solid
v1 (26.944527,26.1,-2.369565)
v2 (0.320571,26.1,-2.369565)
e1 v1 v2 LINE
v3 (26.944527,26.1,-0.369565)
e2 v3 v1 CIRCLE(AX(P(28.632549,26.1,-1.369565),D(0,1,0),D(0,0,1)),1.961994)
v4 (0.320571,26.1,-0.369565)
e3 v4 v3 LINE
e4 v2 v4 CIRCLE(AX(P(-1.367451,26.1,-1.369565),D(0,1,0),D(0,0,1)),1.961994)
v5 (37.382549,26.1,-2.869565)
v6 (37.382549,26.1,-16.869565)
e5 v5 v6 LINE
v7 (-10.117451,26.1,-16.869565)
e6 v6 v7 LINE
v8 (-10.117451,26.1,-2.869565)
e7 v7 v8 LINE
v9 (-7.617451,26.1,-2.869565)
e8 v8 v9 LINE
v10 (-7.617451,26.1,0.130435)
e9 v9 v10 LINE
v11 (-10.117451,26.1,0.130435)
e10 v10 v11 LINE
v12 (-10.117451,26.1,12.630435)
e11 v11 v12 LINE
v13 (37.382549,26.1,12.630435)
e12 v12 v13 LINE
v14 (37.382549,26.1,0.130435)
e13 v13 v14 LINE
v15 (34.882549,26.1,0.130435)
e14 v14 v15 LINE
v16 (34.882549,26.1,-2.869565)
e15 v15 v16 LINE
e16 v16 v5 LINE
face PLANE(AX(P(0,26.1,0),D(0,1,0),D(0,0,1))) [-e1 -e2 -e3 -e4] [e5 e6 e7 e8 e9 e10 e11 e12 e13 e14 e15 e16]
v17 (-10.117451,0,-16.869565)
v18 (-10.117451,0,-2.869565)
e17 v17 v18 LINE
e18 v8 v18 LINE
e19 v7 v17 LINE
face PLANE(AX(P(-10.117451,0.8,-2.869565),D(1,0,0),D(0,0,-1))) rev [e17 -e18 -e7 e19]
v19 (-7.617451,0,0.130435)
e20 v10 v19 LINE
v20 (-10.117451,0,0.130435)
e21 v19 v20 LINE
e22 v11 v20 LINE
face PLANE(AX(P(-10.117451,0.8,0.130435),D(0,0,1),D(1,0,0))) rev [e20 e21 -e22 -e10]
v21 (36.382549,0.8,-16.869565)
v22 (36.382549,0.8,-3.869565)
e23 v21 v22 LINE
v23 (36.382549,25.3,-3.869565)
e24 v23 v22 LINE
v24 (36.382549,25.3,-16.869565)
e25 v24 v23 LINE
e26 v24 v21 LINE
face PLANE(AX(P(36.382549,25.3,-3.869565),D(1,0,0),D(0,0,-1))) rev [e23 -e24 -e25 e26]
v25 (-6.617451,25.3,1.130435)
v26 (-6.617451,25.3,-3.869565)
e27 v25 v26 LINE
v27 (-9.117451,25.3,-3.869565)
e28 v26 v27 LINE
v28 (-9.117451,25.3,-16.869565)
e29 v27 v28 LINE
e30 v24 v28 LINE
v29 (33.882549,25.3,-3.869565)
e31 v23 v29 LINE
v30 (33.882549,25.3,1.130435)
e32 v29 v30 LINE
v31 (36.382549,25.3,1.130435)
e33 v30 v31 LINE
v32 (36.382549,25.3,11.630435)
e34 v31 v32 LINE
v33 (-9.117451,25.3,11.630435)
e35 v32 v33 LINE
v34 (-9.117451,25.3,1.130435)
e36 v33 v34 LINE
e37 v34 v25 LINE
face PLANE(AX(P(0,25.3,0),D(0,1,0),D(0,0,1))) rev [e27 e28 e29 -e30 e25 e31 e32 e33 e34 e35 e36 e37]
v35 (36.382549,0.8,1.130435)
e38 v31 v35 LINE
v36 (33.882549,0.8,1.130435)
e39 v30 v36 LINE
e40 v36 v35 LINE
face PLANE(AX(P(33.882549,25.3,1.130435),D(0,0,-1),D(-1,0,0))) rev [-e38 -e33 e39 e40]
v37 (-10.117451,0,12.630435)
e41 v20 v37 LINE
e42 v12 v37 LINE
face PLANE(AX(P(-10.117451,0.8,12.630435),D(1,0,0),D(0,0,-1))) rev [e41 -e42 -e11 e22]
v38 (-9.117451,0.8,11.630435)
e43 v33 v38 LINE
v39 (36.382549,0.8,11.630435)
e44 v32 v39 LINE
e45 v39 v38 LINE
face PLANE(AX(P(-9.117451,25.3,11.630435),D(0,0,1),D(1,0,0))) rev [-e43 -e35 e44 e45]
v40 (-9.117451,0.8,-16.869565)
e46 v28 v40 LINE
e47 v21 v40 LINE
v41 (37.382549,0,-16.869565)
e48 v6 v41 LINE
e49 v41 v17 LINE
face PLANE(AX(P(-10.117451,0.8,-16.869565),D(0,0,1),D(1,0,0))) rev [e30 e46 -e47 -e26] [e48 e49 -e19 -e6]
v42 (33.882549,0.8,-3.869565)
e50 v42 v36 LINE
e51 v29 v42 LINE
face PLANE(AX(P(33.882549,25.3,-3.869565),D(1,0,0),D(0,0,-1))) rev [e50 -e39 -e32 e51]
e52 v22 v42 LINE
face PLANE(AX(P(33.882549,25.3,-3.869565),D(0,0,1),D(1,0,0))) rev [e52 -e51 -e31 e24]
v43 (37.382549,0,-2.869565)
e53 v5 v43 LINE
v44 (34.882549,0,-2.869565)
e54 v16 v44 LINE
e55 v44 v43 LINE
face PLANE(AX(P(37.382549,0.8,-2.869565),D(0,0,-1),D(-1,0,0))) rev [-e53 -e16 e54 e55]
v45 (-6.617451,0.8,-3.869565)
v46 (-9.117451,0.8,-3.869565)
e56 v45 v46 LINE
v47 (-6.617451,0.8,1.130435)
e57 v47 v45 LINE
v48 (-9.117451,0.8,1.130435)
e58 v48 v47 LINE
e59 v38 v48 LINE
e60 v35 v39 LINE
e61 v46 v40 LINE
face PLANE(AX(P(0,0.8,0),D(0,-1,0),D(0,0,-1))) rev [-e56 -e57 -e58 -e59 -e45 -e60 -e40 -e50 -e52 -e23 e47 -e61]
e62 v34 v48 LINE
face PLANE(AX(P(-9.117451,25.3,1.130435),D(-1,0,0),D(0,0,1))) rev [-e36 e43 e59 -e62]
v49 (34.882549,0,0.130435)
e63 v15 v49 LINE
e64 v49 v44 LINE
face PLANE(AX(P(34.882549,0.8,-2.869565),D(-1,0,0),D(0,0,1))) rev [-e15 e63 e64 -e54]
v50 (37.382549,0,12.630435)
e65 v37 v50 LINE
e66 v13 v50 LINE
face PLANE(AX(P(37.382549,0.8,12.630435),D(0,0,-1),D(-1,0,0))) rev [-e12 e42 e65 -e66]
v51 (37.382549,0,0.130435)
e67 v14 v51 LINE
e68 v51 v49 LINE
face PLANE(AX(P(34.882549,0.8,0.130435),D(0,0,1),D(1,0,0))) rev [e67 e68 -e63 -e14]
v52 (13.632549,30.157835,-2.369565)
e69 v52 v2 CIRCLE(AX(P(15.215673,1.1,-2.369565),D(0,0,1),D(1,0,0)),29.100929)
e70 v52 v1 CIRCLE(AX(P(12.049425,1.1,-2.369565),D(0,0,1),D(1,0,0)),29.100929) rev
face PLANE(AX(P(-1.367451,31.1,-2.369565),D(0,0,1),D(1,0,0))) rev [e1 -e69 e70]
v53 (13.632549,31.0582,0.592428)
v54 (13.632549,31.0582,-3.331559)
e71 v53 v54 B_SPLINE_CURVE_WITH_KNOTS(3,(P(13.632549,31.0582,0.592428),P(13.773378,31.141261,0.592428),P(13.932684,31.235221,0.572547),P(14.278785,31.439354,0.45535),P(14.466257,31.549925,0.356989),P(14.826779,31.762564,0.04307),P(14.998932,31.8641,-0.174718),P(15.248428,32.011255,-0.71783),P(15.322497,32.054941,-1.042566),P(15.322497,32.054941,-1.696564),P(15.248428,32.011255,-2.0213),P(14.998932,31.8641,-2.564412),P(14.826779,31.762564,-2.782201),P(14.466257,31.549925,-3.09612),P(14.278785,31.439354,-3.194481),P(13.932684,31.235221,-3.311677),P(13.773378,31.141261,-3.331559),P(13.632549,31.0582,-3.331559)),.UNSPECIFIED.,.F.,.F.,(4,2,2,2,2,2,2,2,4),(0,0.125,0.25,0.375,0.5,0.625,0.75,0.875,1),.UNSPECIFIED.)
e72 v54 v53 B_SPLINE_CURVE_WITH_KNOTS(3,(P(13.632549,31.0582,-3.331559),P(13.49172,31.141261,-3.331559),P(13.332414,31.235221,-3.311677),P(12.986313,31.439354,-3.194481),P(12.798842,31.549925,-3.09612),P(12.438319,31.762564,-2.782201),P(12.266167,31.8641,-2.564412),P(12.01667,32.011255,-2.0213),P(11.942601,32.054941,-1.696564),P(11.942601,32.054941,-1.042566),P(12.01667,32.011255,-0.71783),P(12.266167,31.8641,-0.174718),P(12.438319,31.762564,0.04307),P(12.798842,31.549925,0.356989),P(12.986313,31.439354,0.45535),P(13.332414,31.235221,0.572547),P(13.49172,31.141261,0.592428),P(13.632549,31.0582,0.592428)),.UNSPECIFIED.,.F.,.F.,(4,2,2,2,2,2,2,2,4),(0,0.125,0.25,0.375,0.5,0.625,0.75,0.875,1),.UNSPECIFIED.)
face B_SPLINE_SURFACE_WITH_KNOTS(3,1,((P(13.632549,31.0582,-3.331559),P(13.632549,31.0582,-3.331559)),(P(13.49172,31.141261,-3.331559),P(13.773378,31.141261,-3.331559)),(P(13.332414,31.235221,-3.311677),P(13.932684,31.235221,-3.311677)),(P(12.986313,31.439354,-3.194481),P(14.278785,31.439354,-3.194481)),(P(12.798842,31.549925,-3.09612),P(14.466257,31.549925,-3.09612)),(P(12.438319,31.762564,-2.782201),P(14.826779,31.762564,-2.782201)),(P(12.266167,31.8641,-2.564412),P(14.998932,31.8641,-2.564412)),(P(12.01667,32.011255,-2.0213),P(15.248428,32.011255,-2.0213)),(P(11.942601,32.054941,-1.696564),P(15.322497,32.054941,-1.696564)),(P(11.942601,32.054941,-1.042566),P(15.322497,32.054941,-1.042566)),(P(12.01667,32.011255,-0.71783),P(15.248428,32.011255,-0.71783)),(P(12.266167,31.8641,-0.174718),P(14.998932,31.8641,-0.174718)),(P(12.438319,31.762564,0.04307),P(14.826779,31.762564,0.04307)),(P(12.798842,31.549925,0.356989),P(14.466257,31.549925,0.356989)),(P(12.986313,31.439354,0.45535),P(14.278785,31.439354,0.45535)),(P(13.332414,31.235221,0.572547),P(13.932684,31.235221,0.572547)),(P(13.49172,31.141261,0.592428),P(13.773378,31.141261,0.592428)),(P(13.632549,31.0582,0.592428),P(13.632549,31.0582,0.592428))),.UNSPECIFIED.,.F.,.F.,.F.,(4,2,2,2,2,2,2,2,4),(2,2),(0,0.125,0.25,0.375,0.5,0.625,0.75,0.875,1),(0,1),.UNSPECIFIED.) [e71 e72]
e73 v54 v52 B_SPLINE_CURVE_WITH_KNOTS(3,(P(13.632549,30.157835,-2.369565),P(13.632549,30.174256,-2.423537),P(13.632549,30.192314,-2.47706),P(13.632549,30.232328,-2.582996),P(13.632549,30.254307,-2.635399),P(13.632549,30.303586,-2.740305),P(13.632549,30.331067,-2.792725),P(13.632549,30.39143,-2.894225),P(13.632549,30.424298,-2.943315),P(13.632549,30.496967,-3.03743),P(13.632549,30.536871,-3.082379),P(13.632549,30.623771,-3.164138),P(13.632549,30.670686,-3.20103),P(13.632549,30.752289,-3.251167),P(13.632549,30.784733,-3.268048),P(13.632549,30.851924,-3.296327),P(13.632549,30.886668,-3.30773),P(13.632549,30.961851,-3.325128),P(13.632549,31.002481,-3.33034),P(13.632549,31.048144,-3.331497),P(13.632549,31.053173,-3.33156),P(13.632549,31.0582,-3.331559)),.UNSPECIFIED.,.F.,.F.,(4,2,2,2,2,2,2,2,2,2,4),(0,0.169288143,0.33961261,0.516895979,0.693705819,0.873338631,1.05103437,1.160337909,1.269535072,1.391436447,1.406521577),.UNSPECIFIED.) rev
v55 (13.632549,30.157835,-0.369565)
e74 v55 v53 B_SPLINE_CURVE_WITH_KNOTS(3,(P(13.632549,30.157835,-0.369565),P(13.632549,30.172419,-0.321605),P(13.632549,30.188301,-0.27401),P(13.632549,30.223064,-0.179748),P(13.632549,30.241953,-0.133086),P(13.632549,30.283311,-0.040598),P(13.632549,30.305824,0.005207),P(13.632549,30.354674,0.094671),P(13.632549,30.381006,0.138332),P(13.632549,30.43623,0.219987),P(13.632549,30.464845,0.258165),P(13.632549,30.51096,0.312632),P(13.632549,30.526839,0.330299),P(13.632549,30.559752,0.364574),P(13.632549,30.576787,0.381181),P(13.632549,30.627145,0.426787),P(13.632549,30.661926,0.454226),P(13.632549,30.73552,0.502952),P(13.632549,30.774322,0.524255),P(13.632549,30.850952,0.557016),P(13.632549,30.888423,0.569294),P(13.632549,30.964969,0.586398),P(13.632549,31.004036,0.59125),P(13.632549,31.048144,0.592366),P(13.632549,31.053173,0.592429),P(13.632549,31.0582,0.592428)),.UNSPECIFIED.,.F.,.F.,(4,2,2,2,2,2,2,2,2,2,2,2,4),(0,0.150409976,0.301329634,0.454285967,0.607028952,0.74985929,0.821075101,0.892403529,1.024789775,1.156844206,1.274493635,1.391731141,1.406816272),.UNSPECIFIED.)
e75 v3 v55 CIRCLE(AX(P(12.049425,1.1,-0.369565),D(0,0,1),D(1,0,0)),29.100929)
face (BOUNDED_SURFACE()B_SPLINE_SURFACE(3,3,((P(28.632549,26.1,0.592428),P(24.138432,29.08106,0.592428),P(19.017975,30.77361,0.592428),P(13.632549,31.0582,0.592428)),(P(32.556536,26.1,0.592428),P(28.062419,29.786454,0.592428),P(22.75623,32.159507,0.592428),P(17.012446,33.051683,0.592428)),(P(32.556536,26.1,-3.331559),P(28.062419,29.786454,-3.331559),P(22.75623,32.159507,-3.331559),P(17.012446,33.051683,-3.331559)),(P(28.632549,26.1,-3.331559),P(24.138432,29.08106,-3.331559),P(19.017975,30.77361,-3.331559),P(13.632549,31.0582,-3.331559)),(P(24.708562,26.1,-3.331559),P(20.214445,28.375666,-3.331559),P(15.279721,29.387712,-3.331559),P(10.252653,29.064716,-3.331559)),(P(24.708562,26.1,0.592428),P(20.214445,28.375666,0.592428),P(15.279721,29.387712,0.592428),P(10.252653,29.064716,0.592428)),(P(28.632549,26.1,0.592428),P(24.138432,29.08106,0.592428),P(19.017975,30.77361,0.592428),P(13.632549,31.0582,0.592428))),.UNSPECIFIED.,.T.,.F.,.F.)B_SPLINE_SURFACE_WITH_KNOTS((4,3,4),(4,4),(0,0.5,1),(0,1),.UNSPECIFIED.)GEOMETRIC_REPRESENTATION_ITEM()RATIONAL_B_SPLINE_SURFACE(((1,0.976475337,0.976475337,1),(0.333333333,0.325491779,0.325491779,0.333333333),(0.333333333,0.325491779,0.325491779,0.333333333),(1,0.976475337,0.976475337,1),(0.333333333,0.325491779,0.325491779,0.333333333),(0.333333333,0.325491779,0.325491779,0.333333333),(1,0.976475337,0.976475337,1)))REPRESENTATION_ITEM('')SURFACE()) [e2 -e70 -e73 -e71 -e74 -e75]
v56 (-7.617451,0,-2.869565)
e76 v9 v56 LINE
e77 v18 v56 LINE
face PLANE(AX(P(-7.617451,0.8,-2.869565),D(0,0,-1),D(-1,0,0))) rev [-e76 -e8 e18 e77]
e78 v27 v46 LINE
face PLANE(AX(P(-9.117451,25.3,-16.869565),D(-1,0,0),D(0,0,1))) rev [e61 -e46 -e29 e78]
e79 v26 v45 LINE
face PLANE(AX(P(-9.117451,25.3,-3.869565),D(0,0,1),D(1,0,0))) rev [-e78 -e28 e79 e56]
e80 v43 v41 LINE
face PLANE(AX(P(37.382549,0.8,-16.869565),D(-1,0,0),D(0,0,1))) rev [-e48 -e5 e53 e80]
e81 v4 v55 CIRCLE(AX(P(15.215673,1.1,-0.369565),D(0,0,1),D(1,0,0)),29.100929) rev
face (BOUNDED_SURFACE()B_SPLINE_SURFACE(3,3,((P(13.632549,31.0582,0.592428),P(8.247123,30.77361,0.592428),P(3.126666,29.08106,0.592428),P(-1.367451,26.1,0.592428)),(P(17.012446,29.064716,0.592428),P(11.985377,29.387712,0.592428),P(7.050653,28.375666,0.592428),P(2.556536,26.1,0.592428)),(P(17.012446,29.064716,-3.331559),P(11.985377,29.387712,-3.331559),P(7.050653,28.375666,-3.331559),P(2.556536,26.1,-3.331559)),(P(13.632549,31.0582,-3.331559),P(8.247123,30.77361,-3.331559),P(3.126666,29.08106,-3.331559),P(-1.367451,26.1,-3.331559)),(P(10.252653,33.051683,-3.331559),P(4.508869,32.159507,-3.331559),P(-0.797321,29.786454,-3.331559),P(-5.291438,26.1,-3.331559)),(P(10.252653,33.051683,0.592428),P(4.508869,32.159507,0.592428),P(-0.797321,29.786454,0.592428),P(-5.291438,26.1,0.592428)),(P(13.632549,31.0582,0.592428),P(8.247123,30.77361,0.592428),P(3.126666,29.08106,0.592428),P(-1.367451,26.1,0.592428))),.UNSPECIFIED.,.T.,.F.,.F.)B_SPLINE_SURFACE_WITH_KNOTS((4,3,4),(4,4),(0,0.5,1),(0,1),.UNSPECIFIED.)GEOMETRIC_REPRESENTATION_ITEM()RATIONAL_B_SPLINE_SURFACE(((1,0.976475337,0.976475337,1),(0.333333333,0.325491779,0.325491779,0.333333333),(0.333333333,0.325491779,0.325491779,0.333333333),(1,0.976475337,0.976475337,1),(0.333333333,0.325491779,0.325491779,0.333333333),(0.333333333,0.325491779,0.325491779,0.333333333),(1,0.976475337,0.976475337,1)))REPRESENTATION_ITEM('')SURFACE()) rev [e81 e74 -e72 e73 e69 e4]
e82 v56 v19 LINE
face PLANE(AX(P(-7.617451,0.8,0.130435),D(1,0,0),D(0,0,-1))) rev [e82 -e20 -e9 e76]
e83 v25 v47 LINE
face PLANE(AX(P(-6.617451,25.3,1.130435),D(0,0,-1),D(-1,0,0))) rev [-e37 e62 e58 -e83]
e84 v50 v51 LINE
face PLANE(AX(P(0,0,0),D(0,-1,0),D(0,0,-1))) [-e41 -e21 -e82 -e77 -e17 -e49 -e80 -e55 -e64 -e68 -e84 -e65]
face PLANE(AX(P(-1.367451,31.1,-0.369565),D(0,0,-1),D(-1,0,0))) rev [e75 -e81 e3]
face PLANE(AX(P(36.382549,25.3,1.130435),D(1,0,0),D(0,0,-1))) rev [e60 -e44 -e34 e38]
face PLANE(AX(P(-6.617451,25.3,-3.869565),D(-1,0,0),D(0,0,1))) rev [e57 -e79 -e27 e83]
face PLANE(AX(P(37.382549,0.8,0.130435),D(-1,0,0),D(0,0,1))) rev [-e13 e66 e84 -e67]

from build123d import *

# Parameters (mm, degrees)
BOSS_EXTRU_1_DEPTH = 0.8
BOSS_EXTRU_2_DEPTH = 24.5
BOSS_EXTRU_3_DEPTH = 0.8
ESQUISSE4_W        = 30
ESQUISSE4_H        = 2
BOSS_EXTRU_4_DEPTH = 5
CONG_1_R           = 30
ESQUISSE5_R        = 1.961993539
ESQUISSE6_R        = 1.961993539


with BuildPart() as part:
    # Esquisse1 → Boss.-Extru.1 (new body)
    with BuildSketch(Plane(origin=(0, 0, 0), x_dir=(1, 0, 0), z_dir=(0, 1, 0))):
        Polygon((-10.117450738, 16.869565217), (37.382549262, 16.869565217), (37.382549262, 2.869565217), (34.882549262, 2.869565217), (34.882549262, -0.130434783), (37.382549262, -0.130434783), (37.382549262, -12.630434783), (-10.117450738, -12.630434783), (-10.117450738, -0.130434783), (-7.617450738, -0.130434783), (-7.617450738, 2.869565217), (-10.117450738, 2.869565217), align=None)
    extrude(amount=BOSS_EXTRU_1_DEPTH)

    # Esquisse2 → Boss.-Extru.2 (add)
    with BuildSketch(Plane(origin=(0, 0.8, 0), x_dir=(1, 0, 0), z_dir=(0, 1, 0))):
        Polygon((-9.117450738, 16.869565217), (-9.117450738, 3.869565217), (-6.617450738, 3.869565217), (-6.617450738, -1.130434783), (-9.117450738, -1.130434783), (-9.117450738, -11.630434783), (36.382549262, -11.630434783), (36.382549262, -1.130434783), (33.882549262, -1.130434783), (33.882549262, 3.869565217), (36.382549262, 3.869565217), (36.382549262, 16.869565217), (37.382549262, 16.869565217), (37.382549262, 2.869565217), (34.882549262, 2.869565217), (34.882549262, -0.130434783), (37.382549262, -0.130434783), (37.382549262, -12.630434783), (-10.117450738, -12.630434783), (-10.117450738, -0.130434783), (-7.617450738, -0.130434783), (-7.617450738, 2.869565217), (-10.117450738, 2.869565217), (-10.117450738, 16.869565217), align=None)
    extrude(amount=BOSS_EXTRU_2_DEPTH)

    # Esquisse3 → Boss.-Extru.3 (add)
    with BuildSketch(Plane(origin=(0, 25.3, 0), x_dir=(1, 0, 0), z_dir=(0, 1, 0))):
        Polygon((-10.117450738, 16.869565217), (-10.117450738, 2.869565217), (-7.617450738, 2.869565217), (-7.617450738, -0.130434783), (-10.117450738, -0.130434783), (-10.117450738, -12.630434783), (37.382549262, -12.630434783), (37.382549262, -0.130434783), (34.882549262, -0.130434783), (34.882549262, 2.869565217), (37.382549262, 2.869565217), (37.382549262, 16.869565217), align=None)
    extrude(amount=BOSS_EXTRU_3_DEPTH)

    # Esquisse4 → Boss.-Extru.4 (add)
    with BuildSketch(Plane(origin=(0, 26.1, 0), x_dir=(1, 0, 0), z_dir=(0, 1, 0))):
        with Locations((13.632549262, 1.369565217)):
            Rectangle(ESQUISSE4_W, ESQUISSE4_H)
    extrude(amount=BOSS_EXTRU_4_DEPTH)

    # Congé1
    # the kernel refuses this fillet: 30 mm, written as the material it takes off along each edge
    with BuildSketch(Plane(origin=(28.632549262, 31.1, -43.827375097), x_dir=(0, -1, 0), z_dir=(0, 0, 1)), Plane(origin=(-1.367450738, 31.1, 41.088244662), x_dir=(0, -1, 0), z_dir=(0, 0, -1))) as cong_1_piece_1:
        with BuildLine():
            CenterArc((30, -16.583123952), CONG_1_R, 146.442690238, 33.557309762)
            Line((0, -16.583123952), (-0.6, -16.583123952))
            Line((-0.6, -16.583123952), (-0.6, 0))
            Line((-0.6, 0), (0, 0.6))
            ThreePointArc((0, 0.6), (2.5, 0.6), (4.5, 0.331662479))
            Line((4.5, 0.331662479), (5, 0))
        make_face()
    extrude(amount=84.915619759, mode=Mode.SUBTRACT)

    # Balayage1: sweep along a curve in space
    with BuildLine() as balayage1_path:
        ThreePointArc((13.632549262, 31.058199521, -0.369565217), (5.800309368, 29.584222364, -0.369565217), (-1.367450738, 26.1, -0.369565217))
    # Esquisse5 → Balayage1 (sweep)
    with BuildSketch(Plane(origin=(0, 26.1, 0), x_dir=(1, 0, 0), z_dir=(0, 1, 0))):
        with Locations((-1.367450738, 1.369565217)):
            Circle(ESQUISSE5_R)
    sweep(path=balayage1_path.line)

    # Balayage2: sweep along a curve in space
    with BuildLine() as balayage2_path:
        ThreePointArc((28.632549262, 26.1, -0.369565217), (21.464789156, 29.584222364, -0.369565217), (13.632549262, 31.058199521, -0.369565217))
    # Esquisse6 → Balayage2 (sweep)
    with BuildSketch(Plane(origin=(0, 26.1, 0), x_dir=(1, 0, 0), z_dir=(0, 1, 0))):
        with Locations((28.632549262, 1.369565217)):
            Circle(ESQUISSE6_R)
    sweep(path=balayage2_path.line)

    # Lissage1: read off the stored shape, not the designer's step
    # Lissage1: loft between two sections, ruled curve by curve
    lissage1_from = [
        Edge.make_bspline([(13.632549262, 31.058199521, -3.331558756), (13.491720249, 31.141261324, -3.331558756), (13.332414469, 31.235220835, -3.311677222), (12.986313087, 31.439353521, -3.194480808), (12.798841505, 31.549925392, -3.096119531), (12.438319232, 31.762563607, -2.782200565), (12.266166728, 31.864100194, -2.564412494), (12.016670345, 32.011254668, -2.021300095), (11.942601106, 32.054941152, -1.696564141), (11.942601106, 32.054941152, -1.042566294), (12.016670345, 32.011254668, -0.717830339), (12.266166728, 31.864100194, -0.174717941), (12.438319232, 31.762563607, 0.04307013), (12.798841505, 31.549925392, 0.356989097), (12.986313087, 31.439353521, 0.455350373), (13.332414469, 31.235220835, 0.572546787), (13.491720249, 31.141261324, 0.592428321), (13.632549262, 31.058199521, 0.592428321)], [0, 0, 0, 0, 0.125, 0.125, 0.25, 0.25, 0.375, 0.375, 0.5, 0.5, 0.625, 0.625, 0.75, 0.75, 0.875, 0.875, 1, 1, 1, 1], 3),
        Edge.make_line((13.632549262, 31.058199521, 0.592428321), (13.632549262, 31.058199521, -3.331558756)),
    ]
    lissage1_to = [
        Edge.make_bspline([(13.632549262, 31.058199521, -3.331558756), (13.773378275, 31.141261324, -3.331558756), (13.932684054, 31.235220835, -3.311677222), (14.278785436, 31.439353521, -3.194480808), (14.466257018, 31.549925392, -3.096119531), (14.826779291, 31.762563607, -2.782200565), (14.998931796, 31.864100194, -2.564412494), (15.248428178, 32.011254668, -2.021300095), (15.322497417, 32.054941152, -1.696564141), (15.322497417, 32.054941152, -1.042566294), (15.248428178, 32.011254668, -0.717830339), (14.998931796, 31.864100194, -0.174717941), (14.826779291, 31.762563607, 0.04307013), (14.466257018, 31.549925392, 0.356989097), (14.278785436, 31.439353521, 0.455350373), (13.932684054, 31.235220835, 0.572546787), (13.773378275, 31.141261324, 0.592428321), (13.632549262, 31.058199521, 0.592428321)], [0, 0, 0, 0, 0.125, 0.125, 0.25, 0.25, 0.375, 0.375, 0.5, 0.5, 0.625, 0.625, 0.75, 0.75, 0.875, 0.875, 1, 1, 1, 1], 3),
        Edge.make_line((13.632549262, 31.058199521, 0.592428321), (13.632549262, 31.058199521, -3.331558756)),
    ]
    lissage1 = Solid(Shell([*[Face.make_surface_from_curves(lissage1_from[k], lissage1_to[k]) for k in range(2)], Face(Wire(lissage1_from)), Face(Wire(lissage1_to))]))
    add(lissage1)


solid = part.part
